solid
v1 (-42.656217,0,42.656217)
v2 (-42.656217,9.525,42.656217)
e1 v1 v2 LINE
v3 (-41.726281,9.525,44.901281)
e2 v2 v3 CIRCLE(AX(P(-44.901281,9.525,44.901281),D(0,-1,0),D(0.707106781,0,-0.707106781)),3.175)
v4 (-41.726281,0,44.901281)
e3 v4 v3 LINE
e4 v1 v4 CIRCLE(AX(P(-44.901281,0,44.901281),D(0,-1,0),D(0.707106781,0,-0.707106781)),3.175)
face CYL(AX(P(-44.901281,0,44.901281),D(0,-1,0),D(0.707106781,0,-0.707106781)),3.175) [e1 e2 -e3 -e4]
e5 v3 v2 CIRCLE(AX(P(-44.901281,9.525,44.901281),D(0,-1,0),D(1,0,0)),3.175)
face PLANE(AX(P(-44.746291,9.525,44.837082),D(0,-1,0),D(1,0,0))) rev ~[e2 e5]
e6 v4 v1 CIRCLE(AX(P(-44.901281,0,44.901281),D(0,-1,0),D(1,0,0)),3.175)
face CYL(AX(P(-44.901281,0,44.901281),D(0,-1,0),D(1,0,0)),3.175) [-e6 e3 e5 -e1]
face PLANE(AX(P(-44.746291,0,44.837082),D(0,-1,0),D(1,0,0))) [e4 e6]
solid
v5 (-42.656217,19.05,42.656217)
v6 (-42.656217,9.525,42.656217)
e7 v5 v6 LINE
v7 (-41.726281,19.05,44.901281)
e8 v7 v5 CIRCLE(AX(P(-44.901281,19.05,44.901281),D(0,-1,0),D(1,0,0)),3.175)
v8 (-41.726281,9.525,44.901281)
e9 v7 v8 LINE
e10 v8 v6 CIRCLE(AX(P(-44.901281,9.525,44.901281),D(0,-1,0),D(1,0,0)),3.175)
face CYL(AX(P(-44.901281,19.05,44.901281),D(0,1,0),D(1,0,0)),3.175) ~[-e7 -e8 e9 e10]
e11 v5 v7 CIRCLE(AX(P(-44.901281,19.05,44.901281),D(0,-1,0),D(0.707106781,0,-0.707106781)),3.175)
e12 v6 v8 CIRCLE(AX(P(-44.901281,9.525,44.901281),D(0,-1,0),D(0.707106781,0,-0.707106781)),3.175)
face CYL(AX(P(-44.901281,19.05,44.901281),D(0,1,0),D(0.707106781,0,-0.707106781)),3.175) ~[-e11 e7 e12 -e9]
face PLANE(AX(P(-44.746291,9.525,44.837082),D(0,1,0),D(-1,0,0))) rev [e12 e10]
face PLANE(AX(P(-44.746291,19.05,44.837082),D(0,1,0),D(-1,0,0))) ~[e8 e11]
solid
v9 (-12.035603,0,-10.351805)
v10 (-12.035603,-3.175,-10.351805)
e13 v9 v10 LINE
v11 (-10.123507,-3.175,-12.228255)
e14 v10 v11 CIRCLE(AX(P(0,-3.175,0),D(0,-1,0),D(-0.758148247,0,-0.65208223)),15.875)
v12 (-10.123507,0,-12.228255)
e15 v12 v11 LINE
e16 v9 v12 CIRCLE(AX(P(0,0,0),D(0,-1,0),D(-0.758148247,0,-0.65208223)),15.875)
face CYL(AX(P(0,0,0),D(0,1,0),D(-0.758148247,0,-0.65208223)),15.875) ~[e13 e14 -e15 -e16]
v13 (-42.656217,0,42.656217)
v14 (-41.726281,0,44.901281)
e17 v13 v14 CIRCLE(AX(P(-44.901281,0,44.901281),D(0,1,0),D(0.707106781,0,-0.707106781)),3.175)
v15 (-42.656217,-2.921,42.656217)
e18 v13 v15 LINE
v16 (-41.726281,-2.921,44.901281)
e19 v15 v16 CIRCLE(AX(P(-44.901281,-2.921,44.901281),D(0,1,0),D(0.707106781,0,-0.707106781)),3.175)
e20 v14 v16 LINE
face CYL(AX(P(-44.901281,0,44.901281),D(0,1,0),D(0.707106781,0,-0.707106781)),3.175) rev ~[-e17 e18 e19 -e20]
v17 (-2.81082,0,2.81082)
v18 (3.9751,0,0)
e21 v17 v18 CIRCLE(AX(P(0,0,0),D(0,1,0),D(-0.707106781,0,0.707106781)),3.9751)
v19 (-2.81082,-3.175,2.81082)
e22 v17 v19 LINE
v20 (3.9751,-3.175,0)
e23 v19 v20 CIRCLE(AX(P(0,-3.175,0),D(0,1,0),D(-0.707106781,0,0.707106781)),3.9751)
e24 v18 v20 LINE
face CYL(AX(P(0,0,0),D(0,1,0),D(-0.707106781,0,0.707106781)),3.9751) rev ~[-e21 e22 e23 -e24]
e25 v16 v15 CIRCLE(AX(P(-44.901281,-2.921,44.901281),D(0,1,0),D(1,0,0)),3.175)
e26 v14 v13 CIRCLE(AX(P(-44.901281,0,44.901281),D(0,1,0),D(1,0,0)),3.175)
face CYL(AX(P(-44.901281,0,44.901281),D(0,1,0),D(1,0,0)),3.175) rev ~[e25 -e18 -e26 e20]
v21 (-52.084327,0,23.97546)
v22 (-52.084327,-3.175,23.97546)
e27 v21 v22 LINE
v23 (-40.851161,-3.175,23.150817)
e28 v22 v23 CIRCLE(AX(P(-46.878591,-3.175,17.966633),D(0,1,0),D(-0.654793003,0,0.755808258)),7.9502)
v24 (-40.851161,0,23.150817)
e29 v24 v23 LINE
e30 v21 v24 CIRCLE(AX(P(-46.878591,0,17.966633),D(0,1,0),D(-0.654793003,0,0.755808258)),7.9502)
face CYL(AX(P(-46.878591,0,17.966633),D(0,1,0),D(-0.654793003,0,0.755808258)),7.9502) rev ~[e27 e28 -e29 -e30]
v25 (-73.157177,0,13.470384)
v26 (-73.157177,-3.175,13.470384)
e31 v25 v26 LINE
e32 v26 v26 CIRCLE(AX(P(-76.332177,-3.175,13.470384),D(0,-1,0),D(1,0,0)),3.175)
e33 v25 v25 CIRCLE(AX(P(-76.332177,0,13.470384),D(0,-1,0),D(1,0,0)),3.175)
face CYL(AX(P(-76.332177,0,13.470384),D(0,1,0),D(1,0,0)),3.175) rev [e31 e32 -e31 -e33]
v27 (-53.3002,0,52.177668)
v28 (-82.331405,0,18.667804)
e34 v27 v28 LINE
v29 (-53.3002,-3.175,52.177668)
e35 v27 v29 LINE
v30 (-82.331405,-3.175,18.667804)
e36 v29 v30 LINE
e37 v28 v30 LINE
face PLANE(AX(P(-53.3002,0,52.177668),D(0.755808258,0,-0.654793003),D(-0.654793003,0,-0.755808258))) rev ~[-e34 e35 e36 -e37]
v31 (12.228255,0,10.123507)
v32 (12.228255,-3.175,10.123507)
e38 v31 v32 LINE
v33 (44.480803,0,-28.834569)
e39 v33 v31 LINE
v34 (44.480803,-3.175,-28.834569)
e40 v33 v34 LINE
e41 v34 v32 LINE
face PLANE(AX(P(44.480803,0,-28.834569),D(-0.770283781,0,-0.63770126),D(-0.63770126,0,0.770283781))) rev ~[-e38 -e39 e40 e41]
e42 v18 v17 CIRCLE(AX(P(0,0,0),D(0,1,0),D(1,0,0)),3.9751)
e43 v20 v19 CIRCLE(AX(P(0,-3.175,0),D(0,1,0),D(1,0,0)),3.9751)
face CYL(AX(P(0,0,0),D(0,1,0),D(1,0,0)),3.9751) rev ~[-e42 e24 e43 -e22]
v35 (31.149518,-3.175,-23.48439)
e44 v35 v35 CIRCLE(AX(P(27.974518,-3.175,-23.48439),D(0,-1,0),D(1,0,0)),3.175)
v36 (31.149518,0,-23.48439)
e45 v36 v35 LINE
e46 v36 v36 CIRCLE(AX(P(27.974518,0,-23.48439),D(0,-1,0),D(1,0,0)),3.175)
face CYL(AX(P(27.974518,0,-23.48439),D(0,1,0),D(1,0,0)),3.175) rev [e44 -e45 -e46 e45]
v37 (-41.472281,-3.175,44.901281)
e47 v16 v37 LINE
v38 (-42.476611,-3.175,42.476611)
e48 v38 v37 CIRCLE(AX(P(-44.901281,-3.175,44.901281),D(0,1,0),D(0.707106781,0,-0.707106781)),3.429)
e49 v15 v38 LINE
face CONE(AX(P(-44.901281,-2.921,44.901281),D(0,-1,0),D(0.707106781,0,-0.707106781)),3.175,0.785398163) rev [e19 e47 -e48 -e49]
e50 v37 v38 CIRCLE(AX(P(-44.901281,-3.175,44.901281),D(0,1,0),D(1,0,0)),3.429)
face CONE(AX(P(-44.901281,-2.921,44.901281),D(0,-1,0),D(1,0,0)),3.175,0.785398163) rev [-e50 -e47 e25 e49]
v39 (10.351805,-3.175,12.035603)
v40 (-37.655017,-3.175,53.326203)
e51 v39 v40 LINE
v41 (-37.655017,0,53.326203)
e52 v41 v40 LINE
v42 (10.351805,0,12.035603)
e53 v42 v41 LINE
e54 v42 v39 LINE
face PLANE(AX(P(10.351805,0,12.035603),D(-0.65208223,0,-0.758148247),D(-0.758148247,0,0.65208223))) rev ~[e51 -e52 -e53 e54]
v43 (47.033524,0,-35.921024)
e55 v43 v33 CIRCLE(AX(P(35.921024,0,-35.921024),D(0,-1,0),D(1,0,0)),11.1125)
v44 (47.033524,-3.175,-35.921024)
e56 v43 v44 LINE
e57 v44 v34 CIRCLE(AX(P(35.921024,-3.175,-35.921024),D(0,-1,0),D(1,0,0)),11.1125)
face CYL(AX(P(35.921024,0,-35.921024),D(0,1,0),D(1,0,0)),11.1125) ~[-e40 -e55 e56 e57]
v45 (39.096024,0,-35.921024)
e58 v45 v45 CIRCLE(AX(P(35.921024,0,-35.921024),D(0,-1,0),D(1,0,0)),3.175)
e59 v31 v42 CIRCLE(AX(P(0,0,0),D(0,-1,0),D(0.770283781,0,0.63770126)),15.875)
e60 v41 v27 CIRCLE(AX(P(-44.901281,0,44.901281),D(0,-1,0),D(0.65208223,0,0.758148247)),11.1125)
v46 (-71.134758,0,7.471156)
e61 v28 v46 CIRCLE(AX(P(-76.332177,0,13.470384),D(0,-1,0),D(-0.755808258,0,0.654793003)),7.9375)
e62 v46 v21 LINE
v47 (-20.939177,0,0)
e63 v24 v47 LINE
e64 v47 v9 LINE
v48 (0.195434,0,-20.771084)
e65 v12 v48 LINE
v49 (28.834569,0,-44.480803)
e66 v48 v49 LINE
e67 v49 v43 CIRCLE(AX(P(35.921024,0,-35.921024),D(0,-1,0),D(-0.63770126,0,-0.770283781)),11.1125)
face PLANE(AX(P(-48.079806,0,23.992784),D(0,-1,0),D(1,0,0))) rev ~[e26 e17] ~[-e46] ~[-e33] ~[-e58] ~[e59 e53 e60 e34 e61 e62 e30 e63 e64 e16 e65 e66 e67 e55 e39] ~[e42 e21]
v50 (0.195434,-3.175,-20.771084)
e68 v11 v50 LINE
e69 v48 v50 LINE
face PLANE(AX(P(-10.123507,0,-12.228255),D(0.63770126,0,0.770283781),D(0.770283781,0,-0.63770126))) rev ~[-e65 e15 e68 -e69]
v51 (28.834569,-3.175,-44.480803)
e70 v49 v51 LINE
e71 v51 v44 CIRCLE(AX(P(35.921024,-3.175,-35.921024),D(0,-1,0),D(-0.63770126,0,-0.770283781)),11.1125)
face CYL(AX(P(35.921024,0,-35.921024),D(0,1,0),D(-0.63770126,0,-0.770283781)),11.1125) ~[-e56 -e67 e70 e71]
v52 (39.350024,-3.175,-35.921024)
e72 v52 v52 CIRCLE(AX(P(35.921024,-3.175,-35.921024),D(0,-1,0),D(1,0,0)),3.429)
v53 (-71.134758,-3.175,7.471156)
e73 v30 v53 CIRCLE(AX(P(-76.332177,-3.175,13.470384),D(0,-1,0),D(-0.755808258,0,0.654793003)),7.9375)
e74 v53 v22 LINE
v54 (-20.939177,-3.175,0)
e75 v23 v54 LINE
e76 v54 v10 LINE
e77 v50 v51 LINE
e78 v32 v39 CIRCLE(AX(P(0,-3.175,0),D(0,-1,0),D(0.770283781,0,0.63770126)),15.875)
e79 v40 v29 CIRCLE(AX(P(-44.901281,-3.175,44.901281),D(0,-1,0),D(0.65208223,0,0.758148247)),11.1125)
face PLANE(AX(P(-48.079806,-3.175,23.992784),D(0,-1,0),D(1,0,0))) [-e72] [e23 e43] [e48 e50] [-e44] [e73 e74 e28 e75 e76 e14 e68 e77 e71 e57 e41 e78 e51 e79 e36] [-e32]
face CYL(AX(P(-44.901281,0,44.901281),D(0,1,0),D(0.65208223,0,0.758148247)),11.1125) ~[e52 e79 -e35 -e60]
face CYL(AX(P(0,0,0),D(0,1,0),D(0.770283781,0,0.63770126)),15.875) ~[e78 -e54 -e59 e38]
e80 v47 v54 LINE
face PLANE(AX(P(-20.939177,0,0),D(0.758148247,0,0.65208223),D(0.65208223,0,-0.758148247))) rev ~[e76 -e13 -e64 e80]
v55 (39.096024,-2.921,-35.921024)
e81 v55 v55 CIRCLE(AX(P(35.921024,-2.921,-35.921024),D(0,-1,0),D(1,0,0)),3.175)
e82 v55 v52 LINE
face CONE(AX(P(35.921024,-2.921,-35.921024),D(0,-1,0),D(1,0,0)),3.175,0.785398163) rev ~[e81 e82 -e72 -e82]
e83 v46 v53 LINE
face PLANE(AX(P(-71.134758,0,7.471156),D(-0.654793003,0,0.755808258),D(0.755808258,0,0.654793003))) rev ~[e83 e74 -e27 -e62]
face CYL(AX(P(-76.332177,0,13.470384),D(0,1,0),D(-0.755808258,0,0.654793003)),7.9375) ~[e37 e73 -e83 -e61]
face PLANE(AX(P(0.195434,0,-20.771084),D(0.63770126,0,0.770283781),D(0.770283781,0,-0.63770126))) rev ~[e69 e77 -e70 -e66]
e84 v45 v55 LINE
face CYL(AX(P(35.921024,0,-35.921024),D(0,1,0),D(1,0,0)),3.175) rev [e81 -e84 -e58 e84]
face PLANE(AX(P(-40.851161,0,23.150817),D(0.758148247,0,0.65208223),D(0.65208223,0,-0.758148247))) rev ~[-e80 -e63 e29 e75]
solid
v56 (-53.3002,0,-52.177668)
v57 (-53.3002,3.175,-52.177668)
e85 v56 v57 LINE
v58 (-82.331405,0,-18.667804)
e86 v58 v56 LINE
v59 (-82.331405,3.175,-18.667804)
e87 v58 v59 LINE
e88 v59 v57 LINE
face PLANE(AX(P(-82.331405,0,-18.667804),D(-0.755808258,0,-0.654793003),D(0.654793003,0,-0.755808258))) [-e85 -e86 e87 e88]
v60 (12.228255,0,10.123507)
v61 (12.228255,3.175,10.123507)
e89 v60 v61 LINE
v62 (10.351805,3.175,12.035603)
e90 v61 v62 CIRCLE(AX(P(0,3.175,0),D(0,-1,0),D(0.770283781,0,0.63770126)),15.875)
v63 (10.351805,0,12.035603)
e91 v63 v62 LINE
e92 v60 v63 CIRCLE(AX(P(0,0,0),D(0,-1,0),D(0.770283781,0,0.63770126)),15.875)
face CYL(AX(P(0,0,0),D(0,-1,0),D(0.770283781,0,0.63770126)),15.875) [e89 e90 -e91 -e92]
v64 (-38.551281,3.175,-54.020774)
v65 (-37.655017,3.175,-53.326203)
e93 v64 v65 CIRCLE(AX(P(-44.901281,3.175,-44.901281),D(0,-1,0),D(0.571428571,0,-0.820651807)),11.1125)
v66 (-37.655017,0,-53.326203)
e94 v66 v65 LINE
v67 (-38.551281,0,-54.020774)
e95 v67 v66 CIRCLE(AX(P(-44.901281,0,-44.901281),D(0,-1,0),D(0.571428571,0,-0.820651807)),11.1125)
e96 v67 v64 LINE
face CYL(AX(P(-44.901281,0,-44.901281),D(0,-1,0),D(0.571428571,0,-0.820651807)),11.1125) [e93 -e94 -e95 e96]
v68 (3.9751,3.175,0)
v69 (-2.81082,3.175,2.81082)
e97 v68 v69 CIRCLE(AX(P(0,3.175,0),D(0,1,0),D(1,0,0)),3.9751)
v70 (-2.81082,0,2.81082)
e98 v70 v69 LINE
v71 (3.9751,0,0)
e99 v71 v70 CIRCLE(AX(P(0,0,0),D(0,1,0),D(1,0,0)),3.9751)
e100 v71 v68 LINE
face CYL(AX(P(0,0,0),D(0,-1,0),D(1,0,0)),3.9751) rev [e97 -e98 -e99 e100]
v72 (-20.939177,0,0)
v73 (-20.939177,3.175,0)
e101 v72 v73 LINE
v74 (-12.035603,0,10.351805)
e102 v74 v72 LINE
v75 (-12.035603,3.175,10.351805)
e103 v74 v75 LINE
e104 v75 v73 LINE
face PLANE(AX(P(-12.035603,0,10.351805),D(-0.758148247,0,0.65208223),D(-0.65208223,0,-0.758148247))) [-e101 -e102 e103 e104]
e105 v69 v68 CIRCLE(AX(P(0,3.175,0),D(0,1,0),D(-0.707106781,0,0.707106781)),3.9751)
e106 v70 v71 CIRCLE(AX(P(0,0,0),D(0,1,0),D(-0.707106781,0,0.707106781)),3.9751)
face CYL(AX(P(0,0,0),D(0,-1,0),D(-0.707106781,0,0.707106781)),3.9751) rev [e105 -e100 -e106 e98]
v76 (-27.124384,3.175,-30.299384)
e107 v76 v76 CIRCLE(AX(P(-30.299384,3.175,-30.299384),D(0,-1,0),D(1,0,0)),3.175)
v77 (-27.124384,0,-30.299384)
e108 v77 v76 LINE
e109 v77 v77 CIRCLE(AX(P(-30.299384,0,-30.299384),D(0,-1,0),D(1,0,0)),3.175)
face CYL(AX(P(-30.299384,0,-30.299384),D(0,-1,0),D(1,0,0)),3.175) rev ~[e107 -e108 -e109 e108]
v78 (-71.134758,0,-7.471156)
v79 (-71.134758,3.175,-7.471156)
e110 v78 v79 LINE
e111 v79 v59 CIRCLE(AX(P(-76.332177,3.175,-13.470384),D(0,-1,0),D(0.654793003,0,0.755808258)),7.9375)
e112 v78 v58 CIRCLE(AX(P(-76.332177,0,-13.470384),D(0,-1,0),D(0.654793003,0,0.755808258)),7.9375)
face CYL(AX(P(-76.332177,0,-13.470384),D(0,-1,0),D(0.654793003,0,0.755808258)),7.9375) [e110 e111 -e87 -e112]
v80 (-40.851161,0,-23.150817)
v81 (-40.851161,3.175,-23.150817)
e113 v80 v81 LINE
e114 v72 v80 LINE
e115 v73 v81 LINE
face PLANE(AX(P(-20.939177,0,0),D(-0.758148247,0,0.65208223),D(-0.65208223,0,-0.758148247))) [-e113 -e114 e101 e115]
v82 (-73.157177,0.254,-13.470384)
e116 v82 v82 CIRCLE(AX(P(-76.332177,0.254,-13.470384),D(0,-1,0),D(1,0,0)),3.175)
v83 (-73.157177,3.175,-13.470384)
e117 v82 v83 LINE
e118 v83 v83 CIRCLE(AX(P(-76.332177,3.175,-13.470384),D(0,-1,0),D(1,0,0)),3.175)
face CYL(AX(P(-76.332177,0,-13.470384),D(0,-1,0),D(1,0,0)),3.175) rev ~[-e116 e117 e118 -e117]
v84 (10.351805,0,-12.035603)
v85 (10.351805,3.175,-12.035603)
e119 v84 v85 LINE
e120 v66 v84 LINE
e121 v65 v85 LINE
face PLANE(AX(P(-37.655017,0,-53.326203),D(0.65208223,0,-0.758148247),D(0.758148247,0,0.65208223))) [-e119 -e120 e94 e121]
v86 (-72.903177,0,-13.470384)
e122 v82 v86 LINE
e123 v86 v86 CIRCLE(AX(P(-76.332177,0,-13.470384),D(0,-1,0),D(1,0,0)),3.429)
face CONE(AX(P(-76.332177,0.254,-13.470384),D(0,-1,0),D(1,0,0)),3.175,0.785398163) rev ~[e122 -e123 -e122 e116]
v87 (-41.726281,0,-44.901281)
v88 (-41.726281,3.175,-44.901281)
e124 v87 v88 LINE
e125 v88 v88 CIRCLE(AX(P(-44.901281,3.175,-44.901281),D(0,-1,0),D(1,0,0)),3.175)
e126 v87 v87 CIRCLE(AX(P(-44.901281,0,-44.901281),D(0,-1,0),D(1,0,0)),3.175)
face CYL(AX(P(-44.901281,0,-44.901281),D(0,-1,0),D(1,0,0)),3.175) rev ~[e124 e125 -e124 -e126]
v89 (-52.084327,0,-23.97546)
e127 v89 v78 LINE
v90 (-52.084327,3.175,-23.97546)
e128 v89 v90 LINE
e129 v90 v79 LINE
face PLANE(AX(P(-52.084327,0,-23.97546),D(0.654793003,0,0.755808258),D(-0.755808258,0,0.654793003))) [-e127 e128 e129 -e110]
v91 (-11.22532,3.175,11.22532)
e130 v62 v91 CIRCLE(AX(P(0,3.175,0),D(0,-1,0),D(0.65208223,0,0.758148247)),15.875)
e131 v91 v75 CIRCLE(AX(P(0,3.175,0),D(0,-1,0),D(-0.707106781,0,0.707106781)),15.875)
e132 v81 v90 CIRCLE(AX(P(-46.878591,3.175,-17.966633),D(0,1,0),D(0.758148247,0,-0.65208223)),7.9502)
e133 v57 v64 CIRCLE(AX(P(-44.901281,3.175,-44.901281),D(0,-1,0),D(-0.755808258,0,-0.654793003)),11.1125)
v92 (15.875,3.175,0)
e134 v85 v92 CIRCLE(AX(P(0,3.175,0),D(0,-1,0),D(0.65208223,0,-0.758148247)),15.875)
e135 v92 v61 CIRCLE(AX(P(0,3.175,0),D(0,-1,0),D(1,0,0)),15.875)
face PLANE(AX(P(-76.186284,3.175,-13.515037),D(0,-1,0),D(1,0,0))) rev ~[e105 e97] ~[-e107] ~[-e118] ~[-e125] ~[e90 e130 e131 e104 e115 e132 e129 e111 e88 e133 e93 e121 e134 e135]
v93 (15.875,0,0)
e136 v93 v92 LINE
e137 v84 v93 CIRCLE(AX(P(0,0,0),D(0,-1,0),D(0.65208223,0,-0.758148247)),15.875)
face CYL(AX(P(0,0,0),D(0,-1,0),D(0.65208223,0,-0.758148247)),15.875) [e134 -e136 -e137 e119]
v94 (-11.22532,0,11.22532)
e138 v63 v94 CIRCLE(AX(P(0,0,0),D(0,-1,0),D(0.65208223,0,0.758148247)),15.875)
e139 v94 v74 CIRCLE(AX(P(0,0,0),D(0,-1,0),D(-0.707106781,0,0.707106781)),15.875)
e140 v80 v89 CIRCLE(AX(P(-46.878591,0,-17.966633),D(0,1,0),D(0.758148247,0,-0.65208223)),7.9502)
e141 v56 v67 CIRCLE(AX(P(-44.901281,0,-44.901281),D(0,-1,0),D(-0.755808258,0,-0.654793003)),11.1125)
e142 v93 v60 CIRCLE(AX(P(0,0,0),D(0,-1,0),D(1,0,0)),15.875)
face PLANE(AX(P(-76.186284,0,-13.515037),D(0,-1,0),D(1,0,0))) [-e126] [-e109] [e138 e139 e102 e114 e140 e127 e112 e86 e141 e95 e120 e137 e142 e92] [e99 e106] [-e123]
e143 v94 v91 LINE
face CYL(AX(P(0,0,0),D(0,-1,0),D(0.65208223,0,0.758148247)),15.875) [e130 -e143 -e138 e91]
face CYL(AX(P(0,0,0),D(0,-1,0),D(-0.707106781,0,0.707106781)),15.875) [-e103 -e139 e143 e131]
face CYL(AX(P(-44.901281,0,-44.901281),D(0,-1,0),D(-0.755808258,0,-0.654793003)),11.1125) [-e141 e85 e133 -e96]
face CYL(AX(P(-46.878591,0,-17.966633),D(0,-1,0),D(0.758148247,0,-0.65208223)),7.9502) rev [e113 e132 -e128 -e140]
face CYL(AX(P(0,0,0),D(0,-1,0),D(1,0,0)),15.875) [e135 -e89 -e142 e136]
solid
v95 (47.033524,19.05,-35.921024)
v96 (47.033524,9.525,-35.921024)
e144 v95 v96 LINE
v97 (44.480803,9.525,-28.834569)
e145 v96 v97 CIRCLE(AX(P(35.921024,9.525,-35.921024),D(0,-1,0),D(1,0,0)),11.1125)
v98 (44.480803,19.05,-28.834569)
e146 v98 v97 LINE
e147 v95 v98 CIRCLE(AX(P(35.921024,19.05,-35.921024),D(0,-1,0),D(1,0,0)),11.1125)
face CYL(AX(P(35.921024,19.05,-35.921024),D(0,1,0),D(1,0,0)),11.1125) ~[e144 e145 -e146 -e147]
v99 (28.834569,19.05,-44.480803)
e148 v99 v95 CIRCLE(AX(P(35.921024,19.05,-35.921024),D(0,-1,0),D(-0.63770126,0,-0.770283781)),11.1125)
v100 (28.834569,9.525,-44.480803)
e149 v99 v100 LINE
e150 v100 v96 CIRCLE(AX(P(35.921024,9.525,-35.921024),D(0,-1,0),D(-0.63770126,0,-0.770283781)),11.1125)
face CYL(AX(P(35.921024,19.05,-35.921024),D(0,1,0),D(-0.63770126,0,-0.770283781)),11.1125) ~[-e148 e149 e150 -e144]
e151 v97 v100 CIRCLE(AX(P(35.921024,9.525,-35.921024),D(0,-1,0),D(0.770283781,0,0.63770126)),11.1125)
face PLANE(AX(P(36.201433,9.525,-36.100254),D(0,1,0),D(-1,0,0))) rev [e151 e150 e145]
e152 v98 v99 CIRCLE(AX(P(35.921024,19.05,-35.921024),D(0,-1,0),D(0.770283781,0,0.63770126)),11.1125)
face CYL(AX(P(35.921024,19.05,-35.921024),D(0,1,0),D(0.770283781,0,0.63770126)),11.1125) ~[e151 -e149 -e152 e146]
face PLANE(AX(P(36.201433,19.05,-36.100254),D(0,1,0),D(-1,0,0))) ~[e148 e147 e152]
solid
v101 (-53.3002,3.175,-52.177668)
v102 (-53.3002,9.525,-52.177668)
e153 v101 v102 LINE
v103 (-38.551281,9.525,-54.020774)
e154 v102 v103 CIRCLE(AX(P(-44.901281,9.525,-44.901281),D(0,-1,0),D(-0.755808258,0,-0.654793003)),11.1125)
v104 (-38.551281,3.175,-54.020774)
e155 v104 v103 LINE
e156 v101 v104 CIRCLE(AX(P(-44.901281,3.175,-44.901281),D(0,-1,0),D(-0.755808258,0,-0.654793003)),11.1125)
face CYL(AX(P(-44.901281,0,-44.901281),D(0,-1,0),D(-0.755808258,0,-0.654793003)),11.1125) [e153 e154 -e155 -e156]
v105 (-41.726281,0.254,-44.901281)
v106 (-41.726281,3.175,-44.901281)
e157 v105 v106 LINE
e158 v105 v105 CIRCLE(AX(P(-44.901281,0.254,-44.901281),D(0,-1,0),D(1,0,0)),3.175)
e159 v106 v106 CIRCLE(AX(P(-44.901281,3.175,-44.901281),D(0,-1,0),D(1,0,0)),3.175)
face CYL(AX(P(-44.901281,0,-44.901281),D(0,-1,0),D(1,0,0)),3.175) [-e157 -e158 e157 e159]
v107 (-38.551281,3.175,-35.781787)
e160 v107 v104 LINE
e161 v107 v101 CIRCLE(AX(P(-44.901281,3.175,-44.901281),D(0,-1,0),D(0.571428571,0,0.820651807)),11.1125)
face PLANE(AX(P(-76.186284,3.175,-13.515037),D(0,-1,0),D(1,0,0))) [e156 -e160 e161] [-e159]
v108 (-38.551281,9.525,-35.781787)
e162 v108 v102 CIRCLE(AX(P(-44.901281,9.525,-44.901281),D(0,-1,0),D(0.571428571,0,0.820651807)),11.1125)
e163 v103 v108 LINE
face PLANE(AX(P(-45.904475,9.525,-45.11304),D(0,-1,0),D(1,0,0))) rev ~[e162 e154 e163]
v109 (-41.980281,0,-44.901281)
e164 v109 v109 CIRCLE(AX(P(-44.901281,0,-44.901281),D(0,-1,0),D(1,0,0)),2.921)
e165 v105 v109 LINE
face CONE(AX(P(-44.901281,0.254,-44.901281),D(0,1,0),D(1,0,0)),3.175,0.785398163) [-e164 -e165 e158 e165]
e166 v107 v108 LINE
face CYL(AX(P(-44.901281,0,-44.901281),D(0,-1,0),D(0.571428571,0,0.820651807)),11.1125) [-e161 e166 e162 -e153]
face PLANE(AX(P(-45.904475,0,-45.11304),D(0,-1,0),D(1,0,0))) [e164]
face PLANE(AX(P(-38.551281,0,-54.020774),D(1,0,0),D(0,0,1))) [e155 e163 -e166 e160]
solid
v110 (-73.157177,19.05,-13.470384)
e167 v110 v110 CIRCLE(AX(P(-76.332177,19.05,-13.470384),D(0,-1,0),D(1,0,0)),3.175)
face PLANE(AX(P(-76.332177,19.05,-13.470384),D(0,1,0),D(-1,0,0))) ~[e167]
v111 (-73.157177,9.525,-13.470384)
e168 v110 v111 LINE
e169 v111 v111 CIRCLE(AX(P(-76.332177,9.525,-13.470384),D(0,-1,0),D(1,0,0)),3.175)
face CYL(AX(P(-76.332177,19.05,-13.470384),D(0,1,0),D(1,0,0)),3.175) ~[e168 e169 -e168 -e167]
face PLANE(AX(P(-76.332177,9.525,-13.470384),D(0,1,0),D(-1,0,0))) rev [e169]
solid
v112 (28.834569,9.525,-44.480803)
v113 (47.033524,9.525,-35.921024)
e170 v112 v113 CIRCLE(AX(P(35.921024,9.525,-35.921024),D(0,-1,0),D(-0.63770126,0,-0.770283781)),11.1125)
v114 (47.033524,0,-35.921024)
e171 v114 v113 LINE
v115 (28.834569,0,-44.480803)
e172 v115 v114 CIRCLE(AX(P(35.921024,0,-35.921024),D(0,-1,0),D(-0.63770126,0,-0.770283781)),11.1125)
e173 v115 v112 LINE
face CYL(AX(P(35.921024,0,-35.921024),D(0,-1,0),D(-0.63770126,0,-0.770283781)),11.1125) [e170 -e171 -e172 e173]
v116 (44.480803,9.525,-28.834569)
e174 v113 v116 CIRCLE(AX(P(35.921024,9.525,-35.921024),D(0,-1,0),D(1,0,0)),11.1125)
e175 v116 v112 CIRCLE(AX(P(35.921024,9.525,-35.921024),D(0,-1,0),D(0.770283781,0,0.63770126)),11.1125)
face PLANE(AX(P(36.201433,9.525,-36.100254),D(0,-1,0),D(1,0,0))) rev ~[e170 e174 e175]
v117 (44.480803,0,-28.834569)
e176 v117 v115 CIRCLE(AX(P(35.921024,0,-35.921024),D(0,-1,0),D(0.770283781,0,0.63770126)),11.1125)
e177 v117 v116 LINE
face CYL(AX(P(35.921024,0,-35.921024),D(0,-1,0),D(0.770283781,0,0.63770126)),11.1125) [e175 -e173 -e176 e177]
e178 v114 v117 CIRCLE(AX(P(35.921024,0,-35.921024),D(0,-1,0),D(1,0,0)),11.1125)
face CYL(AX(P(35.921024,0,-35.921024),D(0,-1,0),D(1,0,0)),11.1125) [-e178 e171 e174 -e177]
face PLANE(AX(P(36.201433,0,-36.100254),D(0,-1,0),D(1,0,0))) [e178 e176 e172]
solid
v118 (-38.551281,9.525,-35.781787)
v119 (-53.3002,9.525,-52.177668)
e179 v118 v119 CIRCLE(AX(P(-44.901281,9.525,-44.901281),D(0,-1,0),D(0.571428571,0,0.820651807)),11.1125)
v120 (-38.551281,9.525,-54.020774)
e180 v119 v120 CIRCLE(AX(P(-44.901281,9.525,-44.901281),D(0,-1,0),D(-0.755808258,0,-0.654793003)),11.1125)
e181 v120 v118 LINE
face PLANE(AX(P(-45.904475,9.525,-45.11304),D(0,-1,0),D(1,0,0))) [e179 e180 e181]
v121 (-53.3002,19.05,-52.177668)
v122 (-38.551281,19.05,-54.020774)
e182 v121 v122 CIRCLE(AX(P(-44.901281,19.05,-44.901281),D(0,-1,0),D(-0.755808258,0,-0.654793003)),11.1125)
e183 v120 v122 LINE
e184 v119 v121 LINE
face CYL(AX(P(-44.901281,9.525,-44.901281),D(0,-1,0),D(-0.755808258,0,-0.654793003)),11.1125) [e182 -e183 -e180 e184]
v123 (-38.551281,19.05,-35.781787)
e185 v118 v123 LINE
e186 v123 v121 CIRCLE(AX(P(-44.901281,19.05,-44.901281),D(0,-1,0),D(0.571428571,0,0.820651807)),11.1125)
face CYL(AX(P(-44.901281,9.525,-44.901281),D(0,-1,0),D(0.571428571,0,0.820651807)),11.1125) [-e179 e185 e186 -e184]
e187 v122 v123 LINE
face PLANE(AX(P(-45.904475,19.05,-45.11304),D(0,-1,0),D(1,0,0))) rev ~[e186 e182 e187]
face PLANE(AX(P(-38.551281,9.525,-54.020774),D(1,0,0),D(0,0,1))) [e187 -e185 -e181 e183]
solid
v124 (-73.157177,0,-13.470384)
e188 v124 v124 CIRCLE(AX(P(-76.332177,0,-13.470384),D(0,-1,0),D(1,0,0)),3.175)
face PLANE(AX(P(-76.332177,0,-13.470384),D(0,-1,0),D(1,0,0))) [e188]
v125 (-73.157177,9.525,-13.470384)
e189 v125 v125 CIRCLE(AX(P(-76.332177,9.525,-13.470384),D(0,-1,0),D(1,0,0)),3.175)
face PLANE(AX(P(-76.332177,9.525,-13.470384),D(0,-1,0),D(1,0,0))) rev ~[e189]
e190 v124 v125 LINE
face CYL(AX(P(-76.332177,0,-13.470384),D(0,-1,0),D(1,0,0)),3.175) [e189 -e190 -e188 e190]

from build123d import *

# Parameters (mm, degrees)
F0_R            = 3.175
F1_DEPTH        = 3.175
F2_DEPTH        = 3.175
F4_DEPTH        = 9.525
F4_COPIES_COUNT = 2
F4_COPIES_PITCH = 9.525
F6_SIZE         = 0.254
F6_2_SIZE       = 0.254
F6_3_SIZE       = 0.254


# Not quite as in the source:
# - a pattern or mirror of a feature is missing from the dataset's text; its kind, count and spacing are read off the source's solid


with BuildPart() as f1:
    # F0 (on Front) → F1 (new body)
    with BuildSketch(Plane.XZ):
        with BuildLine():
            ThreePointArc((-12.0356034274, 10.3518054047), (-11.6386596495, 10.7961672163), (-11.2253201513, 11.2253201513))
            Line((-11.2253201513, 11.2253201513), (-37.0435564994, 37.0435564994))
            ThreePointArc((-37.0435564994, 37.0435564994), (-52.4731730166, 36.7677634349), (-53.300199871, 52.1776678558))
            Line((-53.300199871, 52.1776678558), (-82.331405076, 18.6678036462))
            ThreePointArc((-82.331405076, 18.6678036462), (-73.5586383483, 20.9075469092), (-68.3946770291, 13.4703841816))
            ThreePointArc((-68.3946770291, 13.4703841816), (-69.1121208226, 10.1727039932), (-71.1347575644, 7.4711561347))
            Line((-71.1347575644, 7.4711561347), (-52.0843267669, 23.9754595323))
            ThreePointArc((-52.0843267669, 23.9754595323), (-46.2965222838, 25.8954961667), (-40.8511612346, 23.1508168672))
            Line((-40.8511612346, 23.1508168672), (-20.9391765456, 0))
            Line((-20.9391765456, 0), (-12.0356034274, 10.3518054047))
        make_face()
        with BuildLine():
            ThreePointArc((-53.300199871, 52.1776678558), (-52.4731730166, 36.7677634349), (-37.0435564994, 37.0435564994))
            ThreePointArc((-37.0435564994, 37.0435564994), (-34.6346693003, 40.6487109632), (-33.7887806053, 44.9012806053))
            ThreePointArc((-33.7887806053, 44.9012806053), (-34.8014845049, 49.5361241819), (-37.655016822, 53.3262030046))
            ThreePointArc((-37.655016822, 53.3262030046), (-45.7148756595, 55.9839571475), (-53.300199871, 52.1776678558))
        make_face()
        with BuildLine():
            ThreePointArc((-41.7262806053, 44.9012806053), (-41.9679630896, 43.6862607076), (-42.6562165751, 42.6562165751))
            ThreePointArc((-42.6562165751, 42.6562165751), (-47.8345981211, 46.1163005031), (-41.7262806053, 44.9012806053))
        make_face(mode=Mode.SUBTRACT)
        with BuildLine():
            ThreePointArc((-68.3946770291, 13.4703841816), (-73.5586383483, 20.9075469092), (-82.331405076, 18.6678036462))
            ThreePointArc((-82.331405076, 18.6678036462), (-81.9448371048, 7.8577241059), (-71.1347575644, 7.4711561347))
            ThreePointArc((-71.1347575644, 7.4711561347), (-69.1121208226, 10.1727039932), (-68.3946770291, 13.4703841816))
        make_face()
        with Locations((-76.3321770291, 13.4703841816)):
            Circle(F0_R, mode=Mode.SUBTRACT)
        with BuildLine():
            Line((-37.0435564994, 37.0435564994), (-11.2253201513, 11.2253201513))
            ThreePointArc((-11.2253201513, 11.2253201513), (-0.5957321126, 15.8638182116), (10.3518054047, 12.0356034274))
            Line((10.3518054047, 12.0356034274), (-37.655016822, 53.3262030046))
            ThreePointArc((-37.655016822, 53.3262030046), (-34.8014845049, 49.5361241819), (-33.7887806053, 44.9012806053))
            ThreePointArc((-33.7887806053, 44.9012806053), (-34.6346693003, 40.6487109632), (-37.0435564994, 37.0435564994))
        make_face()
        with BuildLine():
            ThreePointArc((10.3518054047, 12.0356034274), (-0.5957321126, 15.8638182116), (-11.2253201513, 11.2253201513))
            ThreePointArc((-11.2253201513, 11.2253201513), (-11.6386596495, 10.7961672163), (-12.0356034274, 10.3518054047))
            ThreePointArc((-12.0356034274, 10.3518054047), (-15.875, 0), (-12.0356034274, -10.3518054047))
            ThreePointArc((-12.0356034274, -10.3518054047), (-11.1192092809, -11.3304373246), (-10.1235074968, -12.2282550252))
            ThreePointArc((-10.1235074968, -12.2282550252), (0.1493607821, -15.87429735), (10.3518054047, -12.0356034274))
            ThreePointArc((10.3518054047, -12.0356034274), (14.4282801435, -6.6212051093), (15.875, 0))
            ThreePointArc((15.875, 0), (14.9355142785, 5.3801522504), (12.2282550252, 10.1235074968))
            ThreePointArc((12.2282550252, 10.1235074968), (11.3304373246, 11.1192092809), (10.3518054047, 12.0356034274))
        make_face()
        with BuildLine():
            ThreePointArc((3.9751, 0), (-1.521204912, -3.6725135297), (-2.8108201659, 2.8108201659))
            ThreePointArc((-2.8108201659, 2.8108201659), (1.521204912, 3.6725135297), (3.9751, 0))
        make_face(mode=Mode.SUBTRACT)
        with BuildLine():
            ThreePointArc((10.3518054047, -12.0356034274), (0.1493607821, -15.87429735), (-10.1235074968, -12.2282550252))
            Line((-10.1235074968, -12.2282550252), (0.1954344954, -20.7710836138))
            Line((0.1954344954, -20.7710836138), (10.3518054047, -12.0356034274))
        make_face()
        with BuildLine():
            ThreePointArc((-12.0356034274, -10.3518054047), (-15.875, 0), (-12.0356034274, 10.3518054047))
            Line((-12.0356034274, 10.3518054047), (-20.9391765456, 0))
            Line((-20.9391765456, 0), (-12.0356034274, -10.3518054047))
        make_face()
        with BuildLine():
            Line((44.4808030019, -28.8345692365), (12.2282550252, 10.1235074968))
            ThreePointArc((12.2282550252, 10.1235074968), (14.9355142785, 5.3801522504), (15.875, 0))
            ThreePointArc((15.875, 0), (14.4282801435, -6.6212051093), (10.3518054047, -12.0356034274))
            Line((10.3518054047, -12.0356034274), (0.1954344954, -20.7710836138))
            Line((0.1954344954, -20.7710836138), (28.8345692365, -44.4808030019))
            ThreePointArc((28.8345692365, -44.4808030019), (28.0633003783, -28.0633003783), (44.4808030019, -28.8345692365))
        make_face()
        with Locations((27.9745180668, -23.4843900063)):
            Circle(F0_R, mode=Mode.SUBTRACT)
        with BuildLine():
            ThreePointArc((47.0335244843, -35.9210244843), (46.3758844792, -32.154917909), (44.4808030019, -28.8345692365))
            ThreePointArc((44.4808030019, -28.8345692365), (28.0633003783, -28.0633003783), (28.8345692365, -44.4808030019))
            ThreePointArc((28.8345692365, -44.4808030019), (40.650687385, -45.9767663811), (47.0335244843, -35.9210244843))
        make_face()
        with Locations((35.9210244843, -35.9210244843)):
            Circle(F0_R, mode=Mode.SUBTRACT)
    extrude(amount=F1_DEPTH)


with BuildPart() as f2:
    # F0 (on Front) → F2 (new body)
    with BuildSketch(Plane.XZ):
        with BuildLine():
            ThreePointArc((-68.3946770291, -13.4703841816), (-69.1121208226, -10.1727039932), (-71.1347575644, -7.4711561347))
            ThreePointArc((-71.1347575644, -7.4711561347), (-81.9448371048, -7.8577241059), (-82.331405076, -18.6678036462))
            ThreePointArc((-82.331405076, -18.6678036462), (-73.5586383483, -20.9075469092), (-68.3946770291, -13.4703841816))
        make_face()
        with Locations((-76.3321770291, -13.4703841816)):
            Circle(F0_R, mode=Mode.SUBTRACT)
        with BuildLine():
            ThreePointArc((-10.1235074968, -12.2282550252), (-11.1192092809, -11.3304373246), (-12.0356034274, -10.3518054047))
            Line((-12.0356034274, -10.3518054047), (-20.9391765456, 0))
            Line((-20.9391765456, 0), (-40.8511612346, -23.1508168672))
            ThreePointArc((-40.8511612346, -23.1508168672), (-46.2965222838, -25.8954961667), (-52.0843267669, -23.9754595323))
            Line((-52.0843267669, -23.9754595323), (-71.1347575644, -7.4711561347))
            ThreePointArc((-71.1347575644, -7.4711561347), (-69.1121208226, -10.1727039932), (-68.3946770291, -13.4703841816))
            ThreePointArc((-68.3946770291, -13.4703841816), (-73.5586383483, -20.9075469092), (-82.331405076, -18.6678036462))
            Line((-82.331405076, -18.6678036462), (-53.300199871, -52.1776678558))
            ThreePointArc((-53.300199871, -52.1776678558), (-53.1629839096, -37.469462876), (-38.5512806053, -35.781787404))
            ThreePointArc((-38.5512806053, -35.781787404), (-35.0511021488, -39.757192676), (-33.7887806053, -44.9012806053))
            ThreePointArc((-33.7887806053, -44.9012806053), (-34.8014845049, -49.5361241819), (-37.655016822, -53.3262030046))
            Line((-37.655016822, -53.3262030046), (0.1954344954, -20.7710836138))
            Line((0.1954344954, -20.7710836138), (-10.1235074968, -12.2282550252))
        make_face()
        with Locations((-30.2993841525, -30.2993841525)):
            Circle(F0_R, mode=Mode.SUBTRACT)
        with BuildLine():
            ThreePointArc((-53.300199871, -52.1776678558), (-46.2792419349, -55.9280153362), (-38.5512806053, -54.0207738067))
            Line((-38.5512806053, -54.0207738067), (-38.5512806053, -35.781787404))
            ThreePointArc((-38.5512806053, -35.781787404), (-53.1629839096, -37.469462876), (-53.300199871, -52.1776678558))
        make_face()
        with Locations((-44.9012806053, -44.9012806053)):
            Circle(F0_R, mode=Mode.SUBTRACT)
        with BuildLine():
            ThreePointArc((10.3518054047, 12.0356034274), (-0.5957321126, 15.8638182116), (-11.2253201513, 11.2253201513))
            ThreePointArc((-11.2253201513, 11.2253201513), (-11.6386596495, 10.7961672163), (-12.0356034274, 10.3518054047))
            ThreePointArc((-12.0356034274, 10.3518054047), (-15.875, 0), (-12.0356034274, -10.3518054047))
            ThreePointArc((-12.0356034274, -10.3518054047), (-11.1192092809, -11.3304373246), (-10.1235074968, -12.2282550252))
            ThreePointArc((-10.1235074968, -12.2282550252), (0.1493607821, -15.87429735), (10.3518054047, -12.0356034274))
            ThreePointArc((10.3518054047, -12.0356034274), (14.4282801435, -6.6212051093), (15.875, 0))
            ThreePointArc((15.875, 0), (14.9355142785, 5.3801522504), (12.2282550252, 10.1235074968))
            ThreePointArc((12.2282550252, 10.1235074968), (11.3304373246, 11.1192092809), (10.3518054047, 12.0356034274))
        make_face()
        with BuildLine():
            ThreePointArc((3.9751, 0), (-1.521204912, -3.6725135297), (-2.8108201659, 2.8108201659))
            ThreePointArc((-2.8108201659, 2.8108201659), (1.521204912, 3.6725135297), (3.9751, 0))
        make_face(mode=Mode.SUBTRACT)
        with BuildLine():
            ThreePointArc((10.3518054047, -12.0356034274), (0.1493607821, -15.87429735), (-10.1235074968, -12.2282550252))
            Line((-10.1235074968, -12.2282550252), (0.1954344954, -20.7710836138))
            Line((0.1954344954, -20.7710836138), (10.3518054047, -12.0356034274))
        make_face()
        with BuildLine():
            ThreePointArc((-12.0356034274, -10.3518054047), (-15.875, 0), (-12.0356034274, 10.3518054047))
            Line((-12.0356034274, 10.3518054047), (-20.9391765456, 0))
            Line((-20.9391765456, 0), (-12.0356034274, -10.3518054047))
        make_face()
        with BuildLine():
            ThreePointArc((-38.5512806053, -54.0207738067), (-38.0942838839, -53.6849274496), (-37.655016822, -53.3262030046))
            ThreePointArc((-37.655016822, -53.3262030046), (-34.8014845049, -49.5361241819), (-33.7887806053, -44.9012806053))
            ThreePointArc((-33.7887806053, -44.9012806053), (-35.0511021488, -39.757192676), (-38.5512806053, -35.781787404))
            Line((-38.5512806053, -35.781787404), (-38.5512806053, -54.0207738067))
        make_face()
    extrude(amount=-F2_DEPTH)


with BuildPart() as f4:
    # F0 (on Front) → F4 (new body, through all)
    with BuildSketch(Plane.XZ):
        with BuildLine():
            ThreePointArc((-53.300199871, -52.1776678558), (-46.2792419349, -55.9280153362), (-38.5512806053, -54.0207738067))
            Line((-38.5512806053, -54.0207738067), (-38.5512806053, -35.781787404))
            ThreePointArc((-38.5512806053, -35.781787404), (-53.1629839096, -37.469462876), (-53.300199871, -52.1776678558))
        make_face()
        with Locations((-44.9012806053, -44.9012806053)):
            Circle(F0_R, mode=Mode.SUBTRACT)
        with Locations((-44.9012806053, -44.9012806053)):
            Circle(F0_R)
    extrude(amount=-F4_DEPTH)


with BuildPart() as f4b:
    # F0 (on Front) → F4, piece 2 (new body, through all)
    with BuildSketch(Plane.XZ):
        with BuildLine():
            ThreePointArc((47.0335244843, -35.9210244843), (46.3758844792, -32.154917909), (44.4808030019, -28.8345692365))
            ThreePointArc((44.4808030019, -28.8345692365), (28.0633003783, -28.0633003783), (28.8345692365, -44.4808030019))
            ThreePointArc((28.8345692365, -44.4808030019), (40.650687385, -45.9767663811), (47.0335244843, -35.9210244843))
        make_face()
        with Locations((35.9210244843, -35.9210244843)):
            Circle(F0_R, mode=Mode.SUBTRACT)
        with Locations((35.9210244843, -35.9210244843)):
            Circle(F0_R)
    extrude(amount=-F4_DEPTH)


with BuildPart() as f4c:
    # F0 (on Front) → F4, piece 3 (new body, through all)
    with BuildSketch(Plane.XZ):
        with BuildLine():
            ThreePointArc((-41.7262806053, 44.9012806053), (-47.8345981211, 46.1163005031), (-42.6562165751, 42.6562165751))
            ThreePointArc((-42.6562165751, 42.6562165751), (-41.9679630896, 43.6862607076), (-41.7262806053, 44.9012806053))
        make_face()
    extrude(amount=-F4_DEPTH)


with BuildPart() as f4d:
    # F0 (on Front) → F4, piece 4 (new body, through all)
    with BuildSketch(Plane.XZ):
        with Locations((-76.3321770291, -13.4703841816)):
            Circle(F0_R)
    extrude(amount=-F4_DEPTH)


with BuildPart() as f4_copies_1:
    # F4_copies: instance of F4
    add(f4.part.moved(Location(Vector(0, 1, 0) * (1 * F4_COPIES_PITCH))))


with BuildPart() as f4_2_copies_1:
    # F4_2_copies: instance of F4b
    add(f4b.part.mirror(Plane.ZX.offset(9.525)))


with BuildPart() as f4_3_copies_1:
    # F4_3_copies: instance of F4c
    add(f4c.part.mirror(Plane.ZX.offset(9.525)))


with BuildPart() as f4_4_copies_1:
    # F4_4_copies: instance of F4d
    add(f4d.part.mirror(Plane.ZX.offset(9.525)))


with BuildPart() as f4c_1:
    add(f4c.part)

    # F5: cut F1, F2
    add(f1.part, mode=Mode.SUBTRACT)
    add(f2.part, mode=Mode.SUBTRACT)


with BuildPart() as f4b_1:
    add(f4b.part)

    # F5: cut F1, F2
    add(f1.part, mode=Mode.SUBTRACT)
    add(f2.part, mode=Mode.SUBTRACT)


with BuildPart() as f4_1:
    add(f4.part)

    # F5: cut F1, F2
    add(f1.part, mode=Mode.SUBTRACT)
    add(f2.part, mode=Mode.SUBTRACT)

    # F6#3
    f6_3_edges = [f4_1.edges().sort_by_distance(p)[0] for p in [
        (-48.076281, 0, -44.901281),
    ]]
    chamfer(f6_3_edges, length=F6_3_SIZE)


with BuildPart() as f4d_1:
    add(f4d.part)

    # F5: cut F1, F2
    add(f1.part, mode=Mode.SUBTRACT)
    add(f2.part, mode=Mode.SUBTRACT)


with BuildPart() as f1_1:
    add(f1.part)

    # F6
    f6_edges = [f1_1.edges().sort_by_distance(p)[0] for p in [
        (-48.076281, -3.175, 44.901281),
        (32.746024, -3.175, -35.921024),
    ]]
    chamfer(f6_edges, length=F6_SIZE)


with BuildPart() as f2_1:
    add(f2.part)

    # F6#2
    f6_2_edges = [f2_1.edges().sort_by_distance(p)[0] for p in [
        (-79.507177, 0, -13.470384),
    ]]
    chamfer(f6_2_edges, length=F6_2_SIZE)


solid = Compound([f4_copies_1.part, f4_2_copies_1.part, f4_3_copies_1.part, f4_4_copies_1.part, f4c_1.part, f4b_1.part, f4_1.part, f4d_1.part, f1_1.part, f2_1.part])
